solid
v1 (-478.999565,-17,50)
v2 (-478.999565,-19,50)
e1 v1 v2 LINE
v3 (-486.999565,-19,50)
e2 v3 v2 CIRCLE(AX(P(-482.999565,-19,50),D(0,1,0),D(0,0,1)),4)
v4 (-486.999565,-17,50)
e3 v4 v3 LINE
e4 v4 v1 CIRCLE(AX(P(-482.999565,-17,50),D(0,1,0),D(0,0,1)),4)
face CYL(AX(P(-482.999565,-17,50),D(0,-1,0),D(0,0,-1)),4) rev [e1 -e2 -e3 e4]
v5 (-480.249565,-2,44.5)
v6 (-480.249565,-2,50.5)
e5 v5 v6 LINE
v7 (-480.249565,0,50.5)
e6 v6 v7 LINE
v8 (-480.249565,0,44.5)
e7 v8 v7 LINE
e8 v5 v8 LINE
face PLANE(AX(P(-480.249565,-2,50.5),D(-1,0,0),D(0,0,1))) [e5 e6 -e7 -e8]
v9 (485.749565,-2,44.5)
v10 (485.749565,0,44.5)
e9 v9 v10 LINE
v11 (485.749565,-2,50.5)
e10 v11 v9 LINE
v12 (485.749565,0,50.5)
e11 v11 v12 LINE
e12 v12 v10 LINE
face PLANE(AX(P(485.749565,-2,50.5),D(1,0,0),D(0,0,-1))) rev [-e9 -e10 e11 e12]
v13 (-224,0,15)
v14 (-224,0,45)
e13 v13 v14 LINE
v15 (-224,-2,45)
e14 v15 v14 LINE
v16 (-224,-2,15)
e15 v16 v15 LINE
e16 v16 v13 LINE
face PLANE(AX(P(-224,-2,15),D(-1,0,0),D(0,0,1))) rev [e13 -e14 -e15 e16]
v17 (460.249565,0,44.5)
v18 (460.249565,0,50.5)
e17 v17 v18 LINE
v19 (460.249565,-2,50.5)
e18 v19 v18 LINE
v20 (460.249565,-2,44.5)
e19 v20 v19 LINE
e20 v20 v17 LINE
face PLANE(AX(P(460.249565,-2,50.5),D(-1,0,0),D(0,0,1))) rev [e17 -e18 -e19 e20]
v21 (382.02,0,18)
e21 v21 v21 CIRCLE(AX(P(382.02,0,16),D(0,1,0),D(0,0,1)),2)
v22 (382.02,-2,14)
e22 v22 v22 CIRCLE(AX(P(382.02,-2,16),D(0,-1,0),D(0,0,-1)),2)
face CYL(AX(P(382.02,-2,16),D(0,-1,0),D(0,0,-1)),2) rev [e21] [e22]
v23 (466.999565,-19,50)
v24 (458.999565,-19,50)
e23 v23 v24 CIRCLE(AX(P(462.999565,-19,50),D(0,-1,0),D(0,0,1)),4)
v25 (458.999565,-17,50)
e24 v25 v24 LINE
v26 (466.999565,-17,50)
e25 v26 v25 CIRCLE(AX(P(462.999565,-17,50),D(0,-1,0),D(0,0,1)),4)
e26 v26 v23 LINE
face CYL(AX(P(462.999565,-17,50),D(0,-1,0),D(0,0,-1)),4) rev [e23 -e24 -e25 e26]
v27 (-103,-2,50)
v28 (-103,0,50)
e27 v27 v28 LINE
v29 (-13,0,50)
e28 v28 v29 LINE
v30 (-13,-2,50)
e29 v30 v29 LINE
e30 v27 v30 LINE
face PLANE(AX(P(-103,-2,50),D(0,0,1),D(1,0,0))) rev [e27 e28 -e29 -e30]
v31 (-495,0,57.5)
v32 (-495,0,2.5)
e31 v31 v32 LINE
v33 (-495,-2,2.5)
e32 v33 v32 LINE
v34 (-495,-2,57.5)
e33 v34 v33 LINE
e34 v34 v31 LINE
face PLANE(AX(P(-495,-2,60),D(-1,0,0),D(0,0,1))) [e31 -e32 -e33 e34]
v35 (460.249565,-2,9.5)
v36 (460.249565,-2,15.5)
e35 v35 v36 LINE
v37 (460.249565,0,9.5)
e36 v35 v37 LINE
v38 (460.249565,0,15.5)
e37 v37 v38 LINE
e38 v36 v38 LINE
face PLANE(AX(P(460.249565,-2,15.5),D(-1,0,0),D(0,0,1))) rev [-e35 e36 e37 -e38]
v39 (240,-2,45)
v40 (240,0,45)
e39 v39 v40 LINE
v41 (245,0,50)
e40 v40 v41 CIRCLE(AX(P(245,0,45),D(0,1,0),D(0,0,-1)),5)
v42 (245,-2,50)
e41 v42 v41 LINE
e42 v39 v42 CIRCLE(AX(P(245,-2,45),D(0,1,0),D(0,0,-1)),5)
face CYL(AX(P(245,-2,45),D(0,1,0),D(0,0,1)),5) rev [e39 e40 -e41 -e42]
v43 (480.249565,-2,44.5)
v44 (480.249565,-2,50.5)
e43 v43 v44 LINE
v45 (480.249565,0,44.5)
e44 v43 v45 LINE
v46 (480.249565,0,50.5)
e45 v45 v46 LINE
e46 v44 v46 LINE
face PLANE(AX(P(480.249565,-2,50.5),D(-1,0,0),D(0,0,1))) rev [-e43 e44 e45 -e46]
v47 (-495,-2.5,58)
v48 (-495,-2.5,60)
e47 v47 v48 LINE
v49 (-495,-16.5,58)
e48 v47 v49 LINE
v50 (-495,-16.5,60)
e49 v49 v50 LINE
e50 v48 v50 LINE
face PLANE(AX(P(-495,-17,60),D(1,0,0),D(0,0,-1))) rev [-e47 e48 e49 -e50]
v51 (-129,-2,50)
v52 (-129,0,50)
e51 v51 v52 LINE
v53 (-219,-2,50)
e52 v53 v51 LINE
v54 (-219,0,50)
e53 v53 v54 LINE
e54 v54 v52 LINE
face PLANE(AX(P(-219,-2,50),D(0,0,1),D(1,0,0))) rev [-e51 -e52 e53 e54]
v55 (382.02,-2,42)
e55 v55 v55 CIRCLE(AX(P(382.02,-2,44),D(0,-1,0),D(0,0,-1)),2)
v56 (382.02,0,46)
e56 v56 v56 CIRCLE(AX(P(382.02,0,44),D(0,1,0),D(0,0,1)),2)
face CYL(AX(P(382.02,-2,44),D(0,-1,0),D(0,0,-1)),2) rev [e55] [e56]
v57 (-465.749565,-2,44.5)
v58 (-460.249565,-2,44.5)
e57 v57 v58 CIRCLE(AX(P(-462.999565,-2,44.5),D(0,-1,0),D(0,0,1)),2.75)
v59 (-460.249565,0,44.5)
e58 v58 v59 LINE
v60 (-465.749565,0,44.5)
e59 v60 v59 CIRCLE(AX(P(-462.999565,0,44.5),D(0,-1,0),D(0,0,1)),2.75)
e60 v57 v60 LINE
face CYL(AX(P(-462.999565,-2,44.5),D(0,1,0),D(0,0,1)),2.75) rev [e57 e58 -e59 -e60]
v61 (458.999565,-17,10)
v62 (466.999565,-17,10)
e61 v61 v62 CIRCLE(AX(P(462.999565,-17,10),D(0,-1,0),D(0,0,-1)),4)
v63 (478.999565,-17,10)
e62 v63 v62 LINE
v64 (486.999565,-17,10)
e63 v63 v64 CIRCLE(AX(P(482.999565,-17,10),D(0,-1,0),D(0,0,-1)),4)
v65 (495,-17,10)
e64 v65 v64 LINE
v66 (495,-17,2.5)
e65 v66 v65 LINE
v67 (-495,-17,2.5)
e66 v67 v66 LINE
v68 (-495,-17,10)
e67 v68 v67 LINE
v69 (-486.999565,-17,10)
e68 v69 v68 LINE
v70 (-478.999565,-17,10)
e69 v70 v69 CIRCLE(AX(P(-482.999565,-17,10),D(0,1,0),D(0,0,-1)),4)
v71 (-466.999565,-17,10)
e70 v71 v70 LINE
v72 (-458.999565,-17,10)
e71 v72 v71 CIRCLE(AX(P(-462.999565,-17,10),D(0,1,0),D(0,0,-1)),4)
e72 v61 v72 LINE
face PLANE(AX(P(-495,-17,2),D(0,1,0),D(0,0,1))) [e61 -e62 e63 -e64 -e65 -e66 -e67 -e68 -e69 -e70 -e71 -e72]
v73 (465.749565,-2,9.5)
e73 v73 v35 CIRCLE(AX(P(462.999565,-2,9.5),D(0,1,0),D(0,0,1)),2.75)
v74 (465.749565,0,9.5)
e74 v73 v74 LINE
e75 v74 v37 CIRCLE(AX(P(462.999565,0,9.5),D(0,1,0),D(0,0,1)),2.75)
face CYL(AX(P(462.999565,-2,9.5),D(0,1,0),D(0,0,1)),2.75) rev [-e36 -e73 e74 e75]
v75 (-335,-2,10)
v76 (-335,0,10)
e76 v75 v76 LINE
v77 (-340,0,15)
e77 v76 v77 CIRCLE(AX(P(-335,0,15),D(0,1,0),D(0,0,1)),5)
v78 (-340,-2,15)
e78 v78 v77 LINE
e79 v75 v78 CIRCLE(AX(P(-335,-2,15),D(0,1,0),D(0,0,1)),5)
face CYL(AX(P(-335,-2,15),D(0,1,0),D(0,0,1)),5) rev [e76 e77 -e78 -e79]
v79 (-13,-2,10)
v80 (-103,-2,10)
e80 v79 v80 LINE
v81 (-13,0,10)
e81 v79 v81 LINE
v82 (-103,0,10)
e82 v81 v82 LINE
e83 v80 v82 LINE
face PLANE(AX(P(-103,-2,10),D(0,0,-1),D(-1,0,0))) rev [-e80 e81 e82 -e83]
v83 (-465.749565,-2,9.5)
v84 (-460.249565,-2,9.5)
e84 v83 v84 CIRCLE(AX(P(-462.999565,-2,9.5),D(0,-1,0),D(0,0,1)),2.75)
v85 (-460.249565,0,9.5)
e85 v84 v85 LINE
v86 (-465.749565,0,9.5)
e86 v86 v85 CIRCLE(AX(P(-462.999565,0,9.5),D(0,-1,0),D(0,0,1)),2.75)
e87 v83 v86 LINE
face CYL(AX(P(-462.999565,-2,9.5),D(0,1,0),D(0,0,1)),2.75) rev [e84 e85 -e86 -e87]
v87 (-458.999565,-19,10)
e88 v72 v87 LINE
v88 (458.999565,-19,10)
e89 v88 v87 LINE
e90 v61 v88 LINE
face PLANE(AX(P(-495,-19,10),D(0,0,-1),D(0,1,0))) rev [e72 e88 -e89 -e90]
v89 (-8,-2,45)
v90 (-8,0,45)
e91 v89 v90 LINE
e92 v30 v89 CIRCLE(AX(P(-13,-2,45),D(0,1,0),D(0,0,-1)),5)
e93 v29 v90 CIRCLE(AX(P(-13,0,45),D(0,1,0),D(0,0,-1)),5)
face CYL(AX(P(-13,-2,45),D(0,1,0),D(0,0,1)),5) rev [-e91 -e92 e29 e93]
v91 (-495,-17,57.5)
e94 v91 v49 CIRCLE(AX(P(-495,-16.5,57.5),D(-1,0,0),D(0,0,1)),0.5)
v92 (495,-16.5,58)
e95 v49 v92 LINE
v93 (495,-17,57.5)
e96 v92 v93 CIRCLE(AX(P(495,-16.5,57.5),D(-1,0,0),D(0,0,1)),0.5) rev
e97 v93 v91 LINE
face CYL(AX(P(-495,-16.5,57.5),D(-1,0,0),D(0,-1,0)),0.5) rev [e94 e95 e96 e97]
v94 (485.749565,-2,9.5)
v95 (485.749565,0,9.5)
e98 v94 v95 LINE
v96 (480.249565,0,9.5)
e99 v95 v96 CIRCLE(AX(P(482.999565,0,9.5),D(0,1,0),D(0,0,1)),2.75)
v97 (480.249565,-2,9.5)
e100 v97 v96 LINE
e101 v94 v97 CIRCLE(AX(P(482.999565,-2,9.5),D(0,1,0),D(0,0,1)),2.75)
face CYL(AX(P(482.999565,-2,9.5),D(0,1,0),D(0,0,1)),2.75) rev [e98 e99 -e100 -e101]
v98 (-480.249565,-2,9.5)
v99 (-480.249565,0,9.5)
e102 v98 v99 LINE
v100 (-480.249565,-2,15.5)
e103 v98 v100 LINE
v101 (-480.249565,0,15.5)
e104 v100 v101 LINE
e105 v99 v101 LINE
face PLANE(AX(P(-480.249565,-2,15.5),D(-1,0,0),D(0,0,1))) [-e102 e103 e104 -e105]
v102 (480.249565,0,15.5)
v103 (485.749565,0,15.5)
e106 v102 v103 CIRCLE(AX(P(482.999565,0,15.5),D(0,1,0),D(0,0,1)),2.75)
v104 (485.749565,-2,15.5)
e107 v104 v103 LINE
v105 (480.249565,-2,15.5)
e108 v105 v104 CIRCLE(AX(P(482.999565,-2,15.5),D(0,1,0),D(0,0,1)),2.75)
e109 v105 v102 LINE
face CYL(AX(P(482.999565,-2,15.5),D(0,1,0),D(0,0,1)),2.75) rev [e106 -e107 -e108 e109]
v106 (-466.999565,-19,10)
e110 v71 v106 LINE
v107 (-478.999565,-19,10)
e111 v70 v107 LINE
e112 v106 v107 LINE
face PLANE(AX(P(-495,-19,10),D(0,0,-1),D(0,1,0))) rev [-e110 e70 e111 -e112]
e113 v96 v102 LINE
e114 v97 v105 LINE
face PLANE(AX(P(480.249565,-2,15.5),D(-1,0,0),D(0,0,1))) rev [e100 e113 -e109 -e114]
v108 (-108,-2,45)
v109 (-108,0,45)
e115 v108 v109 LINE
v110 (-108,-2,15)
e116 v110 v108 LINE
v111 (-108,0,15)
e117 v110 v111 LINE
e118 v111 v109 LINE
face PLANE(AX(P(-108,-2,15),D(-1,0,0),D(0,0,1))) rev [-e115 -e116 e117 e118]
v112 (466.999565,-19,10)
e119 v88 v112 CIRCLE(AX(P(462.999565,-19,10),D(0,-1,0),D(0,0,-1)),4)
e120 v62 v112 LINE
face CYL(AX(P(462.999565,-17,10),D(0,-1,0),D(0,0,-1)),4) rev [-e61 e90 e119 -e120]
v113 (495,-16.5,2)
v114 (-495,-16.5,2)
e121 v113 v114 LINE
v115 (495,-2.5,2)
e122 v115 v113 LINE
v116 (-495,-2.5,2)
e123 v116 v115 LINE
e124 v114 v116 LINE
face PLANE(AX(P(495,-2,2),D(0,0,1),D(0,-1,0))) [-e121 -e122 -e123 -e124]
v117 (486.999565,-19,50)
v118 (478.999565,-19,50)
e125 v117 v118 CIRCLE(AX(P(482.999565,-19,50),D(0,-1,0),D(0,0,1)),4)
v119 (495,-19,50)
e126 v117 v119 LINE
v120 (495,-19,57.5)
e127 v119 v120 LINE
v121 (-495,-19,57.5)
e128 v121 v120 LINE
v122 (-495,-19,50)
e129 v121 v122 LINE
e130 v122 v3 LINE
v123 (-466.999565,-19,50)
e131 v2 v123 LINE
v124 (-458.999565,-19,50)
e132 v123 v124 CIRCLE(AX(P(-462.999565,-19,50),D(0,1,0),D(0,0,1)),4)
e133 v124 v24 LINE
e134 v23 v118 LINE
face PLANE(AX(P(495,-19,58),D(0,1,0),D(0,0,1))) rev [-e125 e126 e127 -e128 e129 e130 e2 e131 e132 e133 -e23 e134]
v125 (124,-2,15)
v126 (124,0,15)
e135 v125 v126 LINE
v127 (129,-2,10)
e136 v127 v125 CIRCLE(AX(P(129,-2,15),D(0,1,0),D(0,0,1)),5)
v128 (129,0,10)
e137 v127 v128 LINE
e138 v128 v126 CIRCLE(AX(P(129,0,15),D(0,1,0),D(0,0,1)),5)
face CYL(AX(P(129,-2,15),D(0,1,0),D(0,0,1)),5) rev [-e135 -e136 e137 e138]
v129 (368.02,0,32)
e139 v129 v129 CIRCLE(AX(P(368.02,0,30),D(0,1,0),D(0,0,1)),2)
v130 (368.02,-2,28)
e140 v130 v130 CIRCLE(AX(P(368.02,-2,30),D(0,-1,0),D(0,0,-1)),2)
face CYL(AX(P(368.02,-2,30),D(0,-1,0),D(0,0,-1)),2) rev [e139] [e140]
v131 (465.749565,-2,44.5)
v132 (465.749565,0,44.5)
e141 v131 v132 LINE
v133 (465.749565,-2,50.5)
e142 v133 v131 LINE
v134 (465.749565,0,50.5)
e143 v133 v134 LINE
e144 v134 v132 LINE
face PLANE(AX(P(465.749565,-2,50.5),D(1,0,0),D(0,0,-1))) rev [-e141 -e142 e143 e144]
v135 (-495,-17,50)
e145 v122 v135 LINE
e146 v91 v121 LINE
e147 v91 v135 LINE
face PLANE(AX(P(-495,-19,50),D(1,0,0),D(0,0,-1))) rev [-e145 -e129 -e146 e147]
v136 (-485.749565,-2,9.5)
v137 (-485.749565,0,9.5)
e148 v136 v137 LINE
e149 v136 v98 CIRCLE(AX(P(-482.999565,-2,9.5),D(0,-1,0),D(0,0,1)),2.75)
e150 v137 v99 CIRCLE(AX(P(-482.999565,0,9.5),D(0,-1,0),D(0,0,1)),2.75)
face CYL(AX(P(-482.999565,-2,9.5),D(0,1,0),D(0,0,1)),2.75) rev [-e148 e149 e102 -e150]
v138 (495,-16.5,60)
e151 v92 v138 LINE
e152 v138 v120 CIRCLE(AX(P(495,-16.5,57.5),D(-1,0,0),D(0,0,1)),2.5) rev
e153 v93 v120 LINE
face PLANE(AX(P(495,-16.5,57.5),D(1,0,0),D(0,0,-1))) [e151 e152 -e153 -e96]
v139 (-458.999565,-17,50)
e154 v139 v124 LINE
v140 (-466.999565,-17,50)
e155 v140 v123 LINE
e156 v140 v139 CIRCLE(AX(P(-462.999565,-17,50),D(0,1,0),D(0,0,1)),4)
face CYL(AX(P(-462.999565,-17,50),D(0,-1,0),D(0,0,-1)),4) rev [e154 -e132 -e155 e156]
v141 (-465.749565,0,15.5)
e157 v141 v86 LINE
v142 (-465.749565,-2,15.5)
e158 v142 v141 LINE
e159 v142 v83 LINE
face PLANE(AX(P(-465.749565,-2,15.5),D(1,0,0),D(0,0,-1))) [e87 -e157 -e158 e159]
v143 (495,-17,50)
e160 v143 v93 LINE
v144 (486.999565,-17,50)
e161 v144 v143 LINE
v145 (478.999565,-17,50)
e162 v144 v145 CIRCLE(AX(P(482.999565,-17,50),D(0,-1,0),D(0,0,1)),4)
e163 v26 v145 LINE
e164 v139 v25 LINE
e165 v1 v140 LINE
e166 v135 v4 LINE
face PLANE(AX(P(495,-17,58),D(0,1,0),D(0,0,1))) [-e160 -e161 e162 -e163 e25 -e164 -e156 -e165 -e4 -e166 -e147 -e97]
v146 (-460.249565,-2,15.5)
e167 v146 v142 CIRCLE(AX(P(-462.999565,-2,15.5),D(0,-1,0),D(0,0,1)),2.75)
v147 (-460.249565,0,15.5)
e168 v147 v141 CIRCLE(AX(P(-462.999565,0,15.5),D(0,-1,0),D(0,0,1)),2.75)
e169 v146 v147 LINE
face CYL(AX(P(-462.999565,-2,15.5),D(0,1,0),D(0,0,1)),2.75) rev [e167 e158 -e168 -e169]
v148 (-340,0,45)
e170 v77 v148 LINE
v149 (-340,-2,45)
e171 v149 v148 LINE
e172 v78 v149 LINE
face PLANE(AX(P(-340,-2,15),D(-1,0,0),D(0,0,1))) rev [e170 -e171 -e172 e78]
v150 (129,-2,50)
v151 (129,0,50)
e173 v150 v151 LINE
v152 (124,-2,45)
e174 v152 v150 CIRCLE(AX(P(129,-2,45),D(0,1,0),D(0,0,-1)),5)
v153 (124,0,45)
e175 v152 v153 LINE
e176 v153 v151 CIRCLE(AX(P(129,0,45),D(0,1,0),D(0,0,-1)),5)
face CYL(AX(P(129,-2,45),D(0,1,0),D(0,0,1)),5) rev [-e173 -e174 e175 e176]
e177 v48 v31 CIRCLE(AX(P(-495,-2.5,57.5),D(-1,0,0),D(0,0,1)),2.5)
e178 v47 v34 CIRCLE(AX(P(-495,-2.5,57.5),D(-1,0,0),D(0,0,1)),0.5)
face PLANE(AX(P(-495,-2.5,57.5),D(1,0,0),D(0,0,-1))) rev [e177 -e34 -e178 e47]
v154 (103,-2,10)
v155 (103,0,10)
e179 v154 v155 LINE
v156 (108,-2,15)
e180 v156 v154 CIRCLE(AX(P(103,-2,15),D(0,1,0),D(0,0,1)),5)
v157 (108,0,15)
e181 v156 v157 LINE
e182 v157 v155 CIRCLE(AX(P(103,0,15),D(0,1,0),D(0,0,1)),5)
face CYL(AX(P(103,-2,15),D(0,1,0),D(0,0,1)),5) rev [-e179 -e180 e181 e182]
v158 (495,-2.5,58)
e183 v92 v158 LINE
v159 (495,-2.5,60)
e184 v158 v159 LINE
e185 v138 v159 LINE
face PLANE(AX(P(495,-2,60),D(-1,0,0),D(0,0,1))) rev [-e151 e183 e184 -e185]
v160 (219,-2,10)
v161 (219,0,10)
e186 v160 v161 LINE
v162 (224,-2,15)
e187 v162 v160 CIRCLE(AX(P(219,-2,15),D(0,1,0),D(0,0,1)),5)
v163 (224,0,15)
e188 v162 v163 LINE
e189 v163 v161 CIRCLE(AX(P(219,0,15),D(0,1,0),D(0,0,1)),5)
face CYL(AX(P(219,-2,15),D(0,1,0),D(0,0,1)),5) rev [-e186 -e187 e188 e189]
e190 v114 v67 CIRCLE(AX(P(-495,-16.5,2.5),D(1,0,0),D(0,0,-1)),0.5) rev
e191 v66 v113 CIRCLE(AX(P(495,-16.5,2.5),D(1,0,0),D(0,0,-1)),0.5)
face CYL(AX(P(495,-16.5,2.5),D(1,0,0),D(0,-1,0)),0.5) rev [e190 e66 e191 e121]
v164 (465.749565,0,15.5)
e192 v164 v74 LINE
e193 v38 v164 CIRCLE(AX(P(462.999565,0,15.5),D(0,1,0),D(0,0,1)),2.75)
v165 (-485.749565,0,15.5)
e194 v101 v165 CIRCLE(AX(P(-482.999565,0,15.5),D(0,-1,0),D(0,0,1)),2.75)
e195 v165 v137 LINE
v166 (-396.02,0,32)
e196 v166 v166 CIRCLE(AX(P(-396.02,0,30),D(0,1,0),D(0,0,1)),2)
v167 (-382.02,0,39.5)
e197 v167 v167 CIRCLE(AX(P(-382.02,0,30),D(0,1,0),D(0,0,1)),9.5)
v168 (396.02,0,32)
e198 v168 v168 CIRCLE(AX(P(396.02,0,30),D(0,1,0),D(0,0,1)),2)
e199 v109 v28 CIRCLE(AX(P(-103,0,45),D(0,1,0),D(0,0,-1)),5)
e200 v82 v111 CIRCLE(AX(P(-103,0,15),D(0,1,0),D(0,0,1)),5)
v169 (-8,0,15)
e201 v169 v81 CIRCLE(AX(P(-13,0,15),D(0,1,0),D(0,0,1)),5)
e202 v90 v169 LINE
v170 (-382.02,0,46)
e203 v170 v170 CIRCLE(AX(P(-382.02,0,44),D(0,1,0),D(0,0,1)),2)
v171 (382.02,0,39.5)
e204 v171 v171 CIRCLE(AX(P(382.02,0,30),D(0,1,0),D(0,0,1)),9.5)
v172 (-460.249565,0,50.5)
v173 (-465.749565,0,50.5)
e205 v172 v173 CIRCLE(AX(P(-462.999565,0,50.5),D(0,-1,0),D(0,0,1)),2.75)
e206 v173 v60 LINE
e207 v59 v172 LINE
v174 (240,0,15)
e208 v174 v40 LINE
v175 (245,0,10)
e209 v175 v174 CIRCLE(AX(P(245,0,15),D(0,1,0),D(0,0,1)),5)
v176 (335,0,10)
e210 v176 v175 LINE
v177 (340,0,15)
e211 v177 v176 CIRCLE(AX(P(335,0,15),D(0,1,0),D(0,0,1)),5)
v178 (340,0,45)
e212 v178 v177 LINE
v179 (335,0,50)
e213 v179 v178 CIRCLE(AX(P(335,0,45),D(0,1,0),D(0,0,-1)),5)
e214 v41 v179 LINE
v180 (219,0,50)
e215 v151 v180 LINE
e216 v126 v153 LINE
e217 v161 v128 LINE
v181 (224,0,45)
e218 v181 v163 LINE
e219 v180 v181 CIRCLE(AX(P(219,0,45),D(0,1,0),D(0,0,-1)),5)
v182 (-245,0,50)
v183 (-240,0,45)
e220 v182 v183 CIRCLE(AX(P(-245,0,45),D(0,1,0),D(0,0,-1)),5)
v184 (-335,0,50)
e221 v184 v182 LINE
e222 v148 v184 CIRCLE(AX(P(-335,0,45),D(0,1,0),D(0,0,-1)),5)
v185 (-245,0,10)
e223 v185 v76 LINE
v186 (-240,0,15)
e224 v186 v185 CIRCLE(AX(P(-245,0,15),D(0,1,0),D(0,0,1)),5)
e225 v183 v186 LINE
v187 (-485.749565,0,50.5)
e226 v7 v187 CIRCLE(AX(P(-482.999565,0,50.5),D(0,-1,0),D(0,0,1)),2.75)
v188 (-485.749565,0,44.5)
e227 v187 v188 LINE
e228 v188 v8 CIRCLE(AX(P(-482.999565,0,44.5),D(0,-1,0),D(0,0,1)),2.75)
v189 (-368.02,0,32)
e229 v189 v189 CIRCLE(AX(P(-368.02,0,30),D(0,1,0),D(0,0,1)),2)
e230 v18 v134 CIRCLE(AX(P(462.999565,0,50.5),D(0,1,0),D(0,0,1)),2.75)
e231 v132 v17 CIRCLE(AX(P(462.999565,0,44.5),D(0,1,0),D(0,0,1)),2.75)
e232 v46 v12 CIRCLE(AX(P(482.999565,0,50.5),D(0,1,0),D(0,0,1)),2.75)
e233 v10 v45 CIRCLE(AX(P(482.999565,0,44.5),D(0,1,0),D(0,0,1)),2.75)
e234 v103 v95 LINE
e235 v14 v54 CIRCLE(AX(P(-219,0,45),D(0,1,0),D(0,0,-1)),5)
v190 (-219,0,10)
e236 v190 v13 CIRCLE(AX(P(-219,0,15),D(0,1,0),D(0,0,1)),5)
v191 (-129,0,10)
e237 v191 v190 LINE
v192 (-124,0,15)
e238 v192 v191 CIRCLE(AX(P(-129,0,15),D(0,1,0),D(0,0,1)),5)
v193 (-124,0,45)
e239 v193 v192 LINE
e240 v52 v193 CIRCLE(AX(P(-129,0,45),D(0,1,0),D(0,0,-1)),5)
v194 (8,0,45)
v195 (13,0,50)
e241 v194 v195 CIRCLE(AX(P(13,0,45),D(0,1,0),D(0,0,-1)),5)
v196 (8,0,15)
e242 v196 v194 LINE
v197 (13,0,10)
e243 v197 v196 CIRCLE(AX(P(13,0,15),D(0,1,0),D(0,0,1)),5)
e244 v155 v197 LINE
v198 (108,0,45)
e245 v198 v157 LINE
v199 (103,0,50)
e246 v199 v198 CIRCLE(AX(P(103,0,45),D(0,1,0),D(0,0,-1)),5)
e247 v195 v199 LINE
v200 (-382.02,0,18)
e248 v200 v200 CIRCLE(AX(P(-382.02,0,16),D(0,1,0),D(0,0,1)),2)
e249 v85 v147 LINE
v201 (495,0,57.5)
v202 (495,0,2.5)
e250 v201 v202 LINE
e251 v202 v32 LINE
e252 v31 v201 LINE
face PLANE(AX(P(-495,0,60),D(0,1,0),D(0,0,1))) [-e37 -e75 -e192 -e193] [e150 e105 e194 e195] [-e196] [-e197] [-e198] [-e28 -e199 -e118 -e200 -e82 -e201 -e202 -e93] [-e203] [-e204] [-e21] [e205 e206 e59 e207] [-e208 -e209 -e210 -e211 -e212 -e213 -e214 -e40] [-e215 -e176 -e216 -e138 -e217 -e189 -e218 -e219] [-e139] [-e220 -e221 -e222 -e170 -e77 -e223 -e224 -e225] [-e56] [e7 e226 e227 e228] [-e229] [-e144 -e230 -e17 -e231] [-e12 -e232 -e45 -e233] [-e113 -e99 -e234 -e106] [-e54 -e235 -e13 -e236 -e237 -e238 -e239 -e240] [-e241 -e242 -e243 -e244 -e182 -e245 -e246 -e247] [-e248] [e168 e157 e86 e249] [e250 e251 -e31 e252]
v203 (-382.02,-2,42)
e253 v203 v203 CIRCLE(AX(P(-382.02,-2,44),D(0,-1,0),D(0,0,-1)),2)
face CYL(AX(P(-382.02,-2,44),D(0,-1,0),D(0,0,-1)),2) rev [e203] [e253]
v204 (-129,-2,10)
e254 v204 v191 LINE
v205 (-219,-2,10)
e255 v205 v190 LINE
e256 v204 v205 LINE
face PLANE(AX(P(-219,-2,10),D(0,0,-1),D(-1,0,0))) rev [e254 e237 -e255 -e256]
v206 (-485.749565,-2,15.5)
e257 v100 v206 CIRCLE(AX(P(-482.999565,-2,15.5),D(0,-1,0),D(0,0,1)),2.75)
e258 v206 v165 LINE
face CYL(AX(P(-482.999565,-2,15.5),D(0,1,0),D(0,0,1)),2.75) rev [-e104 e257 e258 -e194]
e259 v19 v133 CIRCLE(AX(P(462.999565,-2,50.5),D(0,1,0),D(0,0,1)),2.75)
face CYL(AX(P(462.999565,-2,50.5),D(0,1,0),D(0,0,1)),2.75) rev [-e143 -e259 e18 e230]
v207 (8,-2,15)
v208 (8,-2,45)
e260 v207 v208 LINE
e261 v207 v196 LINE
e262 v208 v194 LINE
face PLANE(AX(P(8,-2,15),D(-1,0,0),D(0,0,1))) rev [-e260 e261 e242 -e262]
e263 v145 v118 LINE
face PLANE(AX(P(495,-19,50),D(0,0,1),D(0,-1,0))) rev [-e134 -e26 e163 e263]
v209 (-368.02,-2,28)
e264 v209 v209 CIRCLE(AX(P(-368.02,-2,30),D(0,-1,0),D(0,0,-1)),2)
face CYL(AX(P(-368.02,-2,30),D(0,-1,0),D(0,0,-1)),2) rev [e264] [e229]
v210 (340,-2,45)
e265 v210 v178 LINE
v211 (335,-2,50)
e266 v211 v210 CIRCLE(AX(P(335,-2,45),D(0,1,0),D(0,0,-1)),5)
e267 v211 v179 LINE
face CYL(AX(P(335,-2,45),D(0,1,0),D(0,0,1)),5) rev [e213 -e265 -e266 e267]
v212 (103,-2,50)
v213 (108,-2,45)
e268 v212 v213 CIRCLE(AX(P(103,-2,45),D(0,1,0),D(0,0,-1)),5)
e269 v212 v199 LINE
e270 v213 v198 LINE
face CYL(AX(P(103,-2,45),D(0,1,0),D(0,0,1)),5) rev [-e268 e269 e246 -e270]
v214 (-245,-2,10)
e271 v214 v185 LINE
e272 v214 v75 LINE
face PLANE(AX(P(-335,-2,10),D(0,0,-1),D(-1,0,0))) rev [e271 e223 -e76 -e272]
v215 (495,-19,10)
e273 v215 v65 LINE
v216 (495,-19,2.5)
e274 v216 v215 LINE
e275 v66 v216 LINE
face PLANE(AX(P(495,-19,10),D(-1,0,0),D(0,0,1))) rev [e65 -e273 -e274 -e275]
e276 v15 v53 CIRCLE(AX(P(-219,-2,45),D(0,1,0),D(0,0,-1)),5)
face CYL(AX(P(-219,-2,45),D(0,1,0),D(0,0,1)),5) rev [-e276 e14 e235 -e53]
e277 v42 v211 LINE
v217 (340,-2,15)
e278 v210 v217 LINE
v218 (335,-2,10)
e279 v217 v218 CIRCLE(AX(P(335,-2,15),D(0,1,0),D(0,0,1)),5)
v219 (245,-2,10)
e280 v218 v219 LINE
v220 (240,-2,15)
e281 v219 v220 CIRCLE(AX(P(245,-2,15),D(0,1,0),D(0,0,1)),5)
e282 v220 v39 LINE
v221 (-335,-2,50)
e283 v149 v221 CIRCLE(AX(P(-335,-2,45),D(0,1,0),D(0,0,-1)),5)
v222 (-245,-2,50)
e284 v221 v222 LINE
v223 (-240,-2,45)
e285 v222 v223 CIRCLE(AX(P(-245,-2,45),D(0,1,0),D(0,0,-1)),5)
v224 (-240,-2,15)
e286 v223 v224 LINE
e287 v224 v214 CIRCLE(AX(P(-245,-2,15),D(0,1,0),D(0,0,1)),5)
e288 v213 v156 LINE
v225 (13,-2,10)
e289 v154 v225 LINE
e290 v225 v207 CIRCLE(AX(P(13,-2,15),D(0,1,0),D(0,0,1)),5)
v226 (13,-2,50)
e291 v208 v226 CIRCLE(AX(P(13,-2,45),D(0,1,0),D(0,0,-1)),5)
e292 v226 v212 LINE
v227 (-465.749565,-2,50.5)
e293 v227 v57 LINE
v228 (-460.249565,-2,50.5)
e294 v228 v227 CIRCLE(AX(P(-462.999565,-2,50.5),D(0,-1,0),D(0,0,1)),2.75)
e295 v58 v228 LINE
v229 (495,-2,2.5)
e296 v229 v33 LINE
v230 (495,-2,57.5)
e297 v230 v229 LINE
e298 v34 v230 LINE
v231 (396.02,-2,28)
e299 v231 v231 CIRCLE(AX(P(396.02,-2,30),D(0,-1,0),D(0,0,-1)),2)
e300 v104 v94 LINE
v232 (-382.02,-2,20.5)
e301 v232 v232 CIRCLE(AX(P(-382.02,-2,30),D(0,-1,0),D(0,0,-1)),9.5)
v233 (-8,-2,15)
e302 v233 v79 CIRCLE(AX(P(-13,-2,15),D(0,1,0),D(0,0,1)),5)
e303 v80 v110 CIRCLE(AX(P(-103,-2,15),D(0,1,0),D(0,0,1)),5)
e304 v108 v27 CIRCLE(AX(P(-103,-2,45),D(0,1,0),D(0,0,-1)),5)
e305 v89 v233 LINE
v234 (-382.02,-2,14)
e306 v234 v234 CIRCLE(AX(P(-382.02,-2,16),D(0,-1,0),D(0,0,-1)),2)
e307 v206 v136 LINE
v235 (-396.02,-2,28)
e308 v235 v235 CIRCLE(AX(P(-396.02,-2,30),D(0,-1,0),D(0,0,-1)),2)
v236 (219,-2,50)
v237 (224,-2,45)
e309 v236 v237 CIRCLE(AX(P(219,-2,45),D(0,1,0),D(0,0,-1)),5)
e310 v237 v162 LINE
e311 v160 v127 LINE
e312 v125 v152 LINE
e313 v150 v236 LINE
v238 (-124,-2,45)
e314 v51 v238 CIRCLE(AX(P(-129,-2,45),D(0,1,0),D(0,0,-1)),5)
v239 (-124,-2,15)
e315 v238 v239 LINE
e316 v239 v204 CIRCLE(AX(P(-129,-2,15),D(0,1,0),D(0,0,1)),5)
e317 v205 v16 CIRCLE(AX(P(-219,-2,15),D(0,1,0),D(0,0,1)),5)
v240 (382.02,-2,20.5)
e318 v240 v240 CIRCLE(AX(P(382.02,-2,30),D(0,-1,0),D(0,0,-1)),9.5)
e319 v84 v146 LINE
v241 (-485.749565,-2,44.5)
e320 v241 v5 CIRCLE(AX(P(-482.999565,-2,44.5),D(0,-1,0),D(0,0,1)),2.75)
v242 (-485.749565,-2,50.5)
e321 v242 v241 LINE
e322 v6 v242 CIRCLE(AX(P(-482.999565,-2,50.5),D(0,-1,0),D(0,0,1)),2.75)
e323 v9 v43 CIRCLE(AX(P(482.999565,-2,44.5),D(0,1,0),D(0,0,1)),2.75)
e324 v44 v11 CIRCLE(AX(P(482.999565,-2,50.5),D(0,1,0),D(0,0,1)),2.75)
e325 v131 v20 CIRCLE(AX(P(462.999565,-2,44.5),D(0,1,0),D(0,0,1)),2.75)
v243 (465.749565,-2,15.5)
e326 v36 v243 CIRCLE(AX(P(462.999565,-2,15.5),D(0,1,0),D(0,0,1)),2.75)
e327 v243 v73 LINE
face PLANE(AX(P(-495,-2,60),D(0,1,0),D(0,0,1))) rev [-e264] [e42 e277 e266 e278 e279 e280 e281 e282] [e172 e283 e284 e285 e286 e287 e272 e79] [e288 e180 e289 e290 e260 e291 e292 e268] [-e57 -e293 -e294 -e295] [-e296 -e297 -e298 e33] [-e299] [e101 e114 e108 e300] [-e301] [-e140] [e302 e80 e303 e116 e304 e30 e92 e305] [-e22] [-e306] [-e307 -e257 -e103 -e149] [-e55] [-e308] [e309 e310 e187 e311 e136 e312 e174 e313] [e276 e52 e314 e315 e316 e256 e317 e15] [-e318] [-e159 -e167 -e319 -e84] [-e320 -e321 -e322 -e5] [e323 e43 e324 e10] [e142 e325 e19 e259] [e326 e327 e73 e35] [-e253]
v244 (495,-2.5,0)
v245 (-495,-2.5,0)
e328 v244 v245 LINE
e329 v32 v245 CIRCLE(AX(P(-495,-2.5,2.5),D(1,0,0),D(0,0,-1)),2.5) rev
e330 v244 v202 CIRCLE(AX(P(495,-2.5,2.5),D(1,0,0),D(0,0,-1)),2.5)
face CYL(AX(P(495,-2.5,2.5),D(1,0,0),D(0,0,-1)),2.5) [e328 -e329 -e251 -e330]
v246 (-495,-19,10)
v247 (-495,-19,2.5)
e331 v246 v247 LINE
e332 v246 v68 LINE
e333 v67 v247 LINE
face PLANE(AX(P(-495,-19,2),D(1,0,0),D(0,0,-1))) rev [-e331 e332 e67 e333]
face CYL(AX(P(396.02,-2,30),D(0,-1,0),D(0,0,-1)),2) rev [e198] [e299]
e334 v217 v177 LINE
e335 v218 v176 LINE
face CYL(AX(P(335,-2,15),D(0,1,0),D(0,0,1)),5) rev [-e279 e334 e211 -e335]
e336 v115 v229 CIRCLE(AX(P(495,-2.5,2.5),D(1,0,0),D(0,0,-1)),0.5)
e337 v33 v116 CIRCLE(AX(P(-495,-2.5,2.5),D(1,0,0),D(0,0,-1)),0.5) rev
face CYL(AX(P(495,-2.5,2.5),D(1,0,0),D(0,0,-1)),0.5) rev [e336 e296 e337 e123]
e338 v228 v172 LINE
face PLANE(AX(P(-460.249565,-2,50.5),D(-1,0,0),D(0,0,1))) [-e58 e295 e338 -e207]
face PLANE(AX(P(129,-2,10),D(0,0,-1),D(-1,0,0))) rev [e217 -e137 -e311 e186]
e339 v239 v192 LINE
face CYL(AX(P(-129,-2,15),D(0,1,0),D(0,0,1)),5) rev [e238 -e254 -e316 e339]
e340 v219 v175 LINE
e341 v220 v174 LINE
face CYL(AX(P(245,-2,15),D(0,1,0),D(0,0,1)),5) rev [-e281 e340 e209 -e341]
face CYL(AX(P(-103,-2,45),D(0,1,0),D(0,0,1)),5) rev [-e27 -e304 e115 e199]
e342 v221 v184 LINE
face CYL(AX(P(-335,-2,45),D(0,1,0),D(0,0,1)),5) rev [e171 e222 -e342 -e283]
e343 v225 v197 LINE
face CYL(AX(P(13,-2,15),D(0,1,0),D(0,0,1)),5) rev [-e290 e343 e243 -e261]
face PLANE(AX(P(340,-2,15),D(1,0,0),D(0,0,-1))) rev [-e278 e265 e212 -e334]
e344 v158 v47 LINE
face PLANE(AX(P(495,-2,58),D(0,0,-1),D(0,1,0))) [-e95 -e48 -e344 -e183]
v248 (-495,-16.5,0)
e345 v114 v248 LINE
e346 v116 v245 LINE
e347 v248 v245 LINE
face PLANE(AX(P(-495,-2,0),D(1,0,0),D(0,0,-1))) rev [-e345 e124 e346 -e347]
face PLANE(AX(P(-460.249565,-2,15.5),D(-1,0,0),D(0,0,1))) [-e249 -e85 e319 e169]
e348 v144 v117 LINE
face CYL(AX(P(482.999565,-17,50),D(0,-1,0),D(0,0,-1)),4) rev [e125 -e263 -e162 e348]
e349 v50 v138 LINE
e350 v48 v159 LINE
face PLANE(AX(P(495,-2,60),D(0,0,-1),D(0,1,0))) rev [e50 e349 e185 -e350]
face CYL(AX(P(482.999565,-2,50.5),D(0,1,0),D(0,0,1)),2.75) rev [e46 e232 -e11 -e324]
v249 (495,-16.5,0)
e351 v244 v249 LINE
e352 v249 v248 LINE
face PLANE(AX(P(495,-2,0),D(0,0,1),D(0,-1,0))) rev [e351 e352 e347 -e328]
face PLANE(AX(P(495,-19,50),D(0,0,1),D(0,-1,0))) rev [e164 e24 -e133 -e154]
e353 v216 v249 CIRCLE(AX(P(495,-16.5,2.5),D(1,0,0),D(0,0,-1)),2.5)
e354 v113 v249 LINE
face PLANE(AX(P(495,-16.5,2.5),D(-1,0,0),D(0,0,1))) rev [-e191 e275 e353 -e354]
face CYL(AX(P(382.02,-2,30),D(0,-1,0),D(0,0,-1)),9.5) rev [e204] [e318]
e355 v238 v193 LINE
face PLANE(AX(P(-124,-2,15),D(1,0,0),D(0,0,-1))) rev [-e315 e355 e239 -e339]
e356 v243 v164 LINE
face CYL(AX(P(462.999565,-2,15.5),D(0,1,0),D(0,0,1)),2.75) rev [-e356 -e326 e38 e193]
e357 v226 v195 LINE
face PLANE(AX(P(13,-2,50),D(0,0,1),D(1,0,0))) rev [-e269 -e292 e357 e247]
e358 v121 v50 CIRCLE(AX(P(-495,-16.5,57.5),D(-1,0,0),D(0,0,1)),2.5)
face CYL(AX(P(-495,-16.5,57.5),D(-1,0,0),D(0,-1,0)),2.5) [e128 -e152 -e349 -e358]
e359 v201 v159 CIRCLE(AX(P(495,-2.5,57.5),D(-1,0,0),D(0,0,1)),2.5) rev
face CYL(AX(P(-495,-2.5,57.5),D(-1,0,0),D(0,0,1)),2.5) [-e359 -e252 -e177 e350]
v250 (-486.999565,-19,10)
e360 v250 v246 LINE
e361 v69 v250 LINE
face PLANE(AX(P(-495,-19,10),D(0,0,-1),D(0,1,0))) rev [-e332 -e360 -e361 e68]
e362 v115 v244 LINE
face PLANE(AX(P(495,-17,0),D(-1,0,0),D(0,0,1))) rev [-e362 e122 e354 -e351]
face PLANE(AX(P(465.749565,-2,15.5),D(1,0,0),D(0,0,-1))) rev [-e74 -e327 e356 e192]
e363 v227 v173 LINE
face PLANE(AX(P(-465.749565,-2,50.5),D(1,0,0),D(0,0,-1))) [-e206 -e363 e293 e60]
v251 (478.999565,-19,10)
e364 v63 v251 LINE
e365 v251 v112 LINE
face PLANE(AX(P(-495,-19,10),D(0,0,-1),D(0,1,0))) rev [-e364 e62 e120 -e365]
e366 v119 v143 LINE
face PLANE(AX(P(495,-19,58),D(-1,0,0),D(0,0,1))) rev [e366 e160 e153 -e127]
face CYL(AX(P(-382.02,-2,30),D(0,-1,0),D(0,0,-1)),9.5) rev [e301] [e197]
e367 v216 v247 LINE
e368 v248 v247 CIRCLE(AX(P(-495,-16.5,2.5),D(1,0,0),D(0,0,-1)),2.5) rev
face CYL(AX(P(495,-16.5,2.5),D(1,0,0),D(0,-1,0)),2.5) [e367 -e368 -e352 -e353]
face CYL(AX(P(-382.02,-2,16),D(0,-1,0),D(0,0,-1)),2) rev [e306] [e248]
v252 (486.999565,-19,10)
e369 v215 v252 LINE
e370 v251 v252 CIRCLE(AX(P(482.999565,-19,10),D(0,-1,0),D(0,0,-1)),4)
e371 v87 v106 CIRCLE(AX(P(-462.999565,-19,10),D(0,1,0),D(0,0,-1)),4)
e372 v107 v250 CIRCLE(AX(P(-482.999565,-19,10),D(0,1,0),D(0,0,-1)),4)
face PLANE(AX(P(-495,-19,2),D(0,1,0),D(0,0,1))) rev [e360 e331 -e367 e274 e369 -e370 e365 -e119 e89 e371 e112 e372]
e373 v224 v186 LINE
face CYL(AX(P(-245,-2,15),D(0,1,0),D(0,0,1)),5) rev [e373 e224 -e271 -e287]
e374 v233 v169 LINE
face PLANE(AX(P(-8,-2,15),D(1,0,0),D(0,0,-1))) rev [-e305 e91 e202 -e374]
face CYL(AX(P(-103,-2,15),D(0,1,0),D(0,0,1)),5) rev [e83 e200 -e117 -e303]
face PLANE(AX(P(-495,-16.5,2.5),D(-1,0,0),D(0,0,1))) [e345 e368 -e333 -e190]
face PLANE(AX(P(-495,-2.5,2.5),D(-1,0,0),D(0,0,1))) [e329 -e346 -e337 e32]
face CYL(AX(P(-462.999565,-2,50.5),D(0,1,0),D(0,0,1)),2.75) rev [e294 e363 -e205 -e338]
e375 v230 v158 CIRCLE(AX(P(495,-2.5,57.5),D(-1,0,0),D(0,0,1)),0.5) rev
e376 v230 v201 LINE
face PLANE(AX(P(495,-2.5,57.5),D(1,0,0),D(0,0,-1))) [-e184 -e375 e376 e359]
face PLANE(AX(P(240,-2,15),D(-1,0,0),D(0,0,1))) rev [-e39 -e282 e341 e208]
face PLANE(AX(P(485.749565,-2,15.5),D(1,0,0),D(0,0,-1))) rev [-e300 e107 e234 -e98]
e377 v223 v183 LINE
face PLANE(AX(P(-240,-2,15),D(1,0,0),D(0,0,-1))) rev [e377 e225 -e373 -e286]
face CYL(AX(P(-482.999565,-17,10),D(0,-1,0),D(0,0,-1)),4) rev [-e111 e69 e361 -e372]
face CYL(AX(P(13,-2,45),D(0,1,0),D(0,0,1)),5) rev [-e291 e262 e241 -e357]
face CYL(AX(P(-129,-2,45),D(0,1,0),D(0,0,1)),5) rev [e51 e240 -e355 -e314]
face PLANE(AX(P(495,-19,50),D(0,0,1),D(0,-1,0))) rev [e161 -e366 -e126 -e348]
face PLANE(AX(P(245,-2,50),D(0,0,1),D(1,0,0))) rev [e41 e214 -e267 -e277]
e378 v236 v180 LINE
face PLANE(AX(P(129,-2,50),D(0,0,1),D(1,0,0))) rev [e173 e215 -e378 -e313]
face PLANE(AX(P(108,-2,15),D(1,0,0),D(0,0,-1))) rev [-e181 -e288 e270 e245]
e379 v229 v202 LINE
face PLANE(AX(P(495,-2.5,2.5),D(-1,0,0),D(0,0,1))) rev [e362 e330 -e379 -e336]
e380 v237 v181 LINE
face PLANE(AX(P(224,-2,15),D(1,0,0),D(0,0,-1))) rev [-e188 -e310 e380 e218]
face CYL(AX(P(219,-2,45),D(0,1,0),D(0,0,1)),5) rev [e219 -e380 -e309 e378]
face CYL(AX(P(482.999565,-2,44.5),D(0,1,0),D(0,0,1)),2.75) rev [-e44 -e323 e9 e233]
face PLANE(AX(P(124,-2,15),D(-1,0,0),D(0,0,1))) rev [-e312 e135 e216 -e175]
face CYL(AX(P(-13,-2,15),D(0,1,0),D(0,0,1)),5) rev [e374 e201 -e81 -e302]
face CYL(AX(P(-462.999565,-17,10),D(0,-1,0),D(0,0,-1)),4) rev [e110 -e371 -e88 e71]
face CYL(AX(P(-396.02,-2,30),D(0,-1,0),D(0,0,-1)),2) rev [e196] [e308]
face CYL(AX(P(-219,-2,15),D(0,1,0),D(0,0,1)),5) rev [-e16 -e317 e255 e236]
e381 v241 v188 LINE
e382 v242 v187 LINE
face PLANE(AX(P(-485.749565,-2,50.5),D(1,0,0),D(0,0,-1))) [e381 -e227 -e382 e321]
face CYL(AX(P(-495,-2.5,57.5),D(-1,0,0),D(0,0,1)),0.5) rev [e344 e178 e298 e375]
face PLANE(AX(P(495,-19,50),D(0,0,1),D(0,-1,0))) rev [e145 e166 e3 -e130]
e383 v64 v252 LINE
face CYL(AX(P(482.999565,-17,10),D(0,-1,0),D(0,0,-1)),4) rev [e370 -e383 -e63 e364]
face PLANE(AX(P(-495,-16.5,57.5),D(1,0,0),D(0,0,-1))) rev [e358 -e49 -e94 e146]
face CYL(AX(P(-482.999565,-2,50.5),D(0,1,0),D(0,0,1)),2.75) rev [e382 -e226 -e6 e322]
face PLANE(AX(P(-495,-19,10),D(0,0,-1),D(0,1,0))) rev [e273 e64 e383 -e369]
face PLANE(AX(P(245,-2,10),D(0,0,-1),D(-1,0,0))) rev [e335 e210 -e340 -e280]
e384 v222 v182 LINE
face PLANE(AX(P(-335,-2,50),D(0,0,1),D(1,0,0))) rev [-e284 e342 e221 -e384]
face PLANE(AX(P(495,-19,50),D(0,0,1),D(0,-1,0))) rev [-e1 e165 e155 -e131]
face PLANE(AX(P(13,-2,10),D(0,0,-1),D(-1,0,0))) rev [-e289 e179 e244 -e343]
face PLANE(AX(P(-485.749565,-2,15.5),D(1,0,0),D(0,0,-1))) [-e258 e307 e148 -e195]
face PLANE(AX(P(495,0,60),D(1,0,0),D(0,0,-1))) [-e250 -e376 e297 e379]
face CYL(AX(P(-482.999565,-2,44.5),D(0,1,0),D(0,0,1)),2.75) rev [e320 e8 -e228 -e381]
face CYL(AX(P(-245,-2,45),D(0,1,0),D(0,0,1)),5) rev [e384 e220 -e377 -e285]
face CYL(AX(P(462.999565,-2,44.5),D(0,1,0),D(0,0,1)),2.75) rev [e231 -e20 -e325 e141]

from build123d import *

# Parameters (mm, degrees)
SKETCH_1_W                       = 990
SKETCH_1_H                       = 2
SM_BASE_FLANGE_1_DEPTH           = 60
SM_EDGE_FLANGE_1_STRIP_W         = 9
SM_EDGE_FLANGE_1_STRIP_H         = 2
SM_EDGE_FLANGE_1_STRIP_CUT_DEPTH = 990
SM_EDGE_FLANGE_1_DEPTH           = 990
SM_EDGE_FLANGE_2_STRIP_W         = 9
SM_EDGE_FLANGE_2_STRIP_H         = 2
SM_EDGE_FLANGE_2_STRIP_CUT_DEPTH = 990
SM_EDGE_FLANGE_2_DEPTH           = 990
SM_EDGE_FLANGE_3_STRIP_W         = 9
SM_EDGE_FLANGE_3_STRIP_H         = 2
SM_EDGE_FLANGE_3_STRIP_CUT_DEPTH = 990
SM_EDGE_FLANGE_3_DEPTH           = 990
SM_EDGE_FLANGE_4_STRIP_W         = 9
SM_EDGE_FLANGE_4_STRIP_H         = 2
SM_EDGE_FLANGE_4_STRIP_CUT_DEPTH = 990
SM_EDGE_FLANGE_4_DEPTH           = 990
HOLE_WIZARD_19_0_19_1_D          = 19
HOLE_WIZARD_M4_1_D               = 4
PATTERN_LINEAR_1_COUNT           = 2
PATTERN_LINEAR_1_PITCH           = 764.04
CUT_EXTRUDE_1_DEPTH              = 2
PATTERN_LINEAR_2_COUNT           = 2
PATTERN_LINEAR_2_PITCH           = 20
PATTERN_LINEAR_2_COUNT_DIR2      = 2
PATTERN_LINEAR_2_PITCH_DIR2      = 35
CUT_EXTRUDE_4_DEPTH              = 2
MIRROR_1_COPY_1_DEPTH            = 2
MIRROR_1_COPY_2_DEPTH            = 2
MIRROR_1_COPY_3_DEPTH            = 2
CUT_EXTRUDE_2_DEPTH              = 2
PATTERN_LINEAR_3_COUNT           = 6
PATTERN_LINEAR_3_PITCH           = 116


# Sheet-metal steps are written as plain solids
with BuildPart() as part:
    # Sketch 1 → 基体-法兰1 (new body)
    with BuildSketch(Plane.XY):
        with Locations((0, -1)):
            Rectangle(SKETCH_1_W, SKETCH_1_H)
    extrude(amount=SM_BASE_FLANGE_1_DEPTH)

    # 边线-法兰1 strip (across the edge) → 边线-法兰1 strip cut (cut)
    with BuildSketch(Plane(origin=(-495, -2, 0), x_dir=(0, 0, 1), z_dir=(1, 0, 0))):
        with Locations((-2, -1)):
            Rectangle(SM_EDGE_FLANGE_1_STRIP_W, SM_EDGE_FLANGE_1_STRIP_H)
    extrude(amount=SM_EDGE_FLANGE_1_STRIP_CUT_DEPTH, mode=Mode.SUBTRACT)

    # 边线-法兰1 section (across the edge) → 边线-法兰1 (add)
    with BuildSketch(Plane(origin=(-495, -2, 0), x_dir=(0, 0, 1), z_dir=(1, 0, 0))):
        with BuildLine():
            Line((0, 0.5), (0, 15))
            Line((0, 15), (2, 15))
            Line((2, 15), (2, 0.5))
            ThreePointArc((2, 0.5), (2.146446609, 0.146446609), (2.5, 0))
            Line((2.5, 0), (2.5, -2))
            ThreePointArc((2.5, -2), (0.732233047, -1.267766953), (0, 0.5))
        make_face()
    extrude(amount=SM_EDGE_FLANGE_1_DEPTH)

    # 边线-法兰2 strip (across the edge) → 边线-法兰2 strip cut (cut)
    with BuildSketch(Plane(origin=(495, -2, 60), x_dir=(0, 0, -1), z_dir=(-1, 0, 0))):
        with Locations((-2, -1)):
            Rectangle(SM_EDGE_FLANGE_2_STRIP_W, SM_EDGE_FLANGE_2_STRIP_H)
    extrude(amount=SM_EDGE_FLANGE_2_STRIP_CUT_DEPTH, mode=Mode.SUBTRACT)

    # 边线-法兰2 section (across the edge) → 边线-法兰2 (add)
    with BuildSketch(Plane(origin=(495, -2, 60), x_dir=(0, 0, -1), z_dir=(-1, 0, 0))):
        with BuildLine():
            Line((0, 0.5), (0, 15))
            Line((0, 15), (2, 15))
            Line((2, 15), (2, 0.5))
            ThreePointArc((2, 0.5), (2.146446609, 0.146446609), (2.5, 0))
            Line((2.5, 0), (2.5, -2))
            ThreePointArc((2.5, -2), (0.732233047, -1.267766953), (0, 0.5))
        make_face()
    extrude(amount=SM_EDGE_FLANGE_2_DEPTH)

    # 边线-法兰3 strip (across the edge) → 边线-法兰3 strip cut (cut)
    with BuildSketch(Plane(origin=(495, -17, 58), x_dir=(0, 1, 0), z_dir=(-1, 0, 0))):
        with Locations((-4, -1)):
            Rectangle(SM_EDGE_FLANGE_3_STRIP_W, SM_EDGE_FLANGE_3_STRIP_H)
    extrude(amount=SM_EDGE_FLANGE_3_STRIP_CUT_DEPTH, mode=Mode.SUBTRACT)

    # 边线-法兰3 section (across the edge) → 边线-法兰3 (add)
    with BuildSketch(Plane(origin=(495, -17, 58), x_dir=(0, 1, 0), z_dir=(-1, 0, 0))):
        with BuildLine():
            Line((-2, 0.5), (-2, 8))
            Line((-2, 8), (0, 8))
            Line((0, 8), (0, 0.5))
            ThreePointArc((0, 0.5), (0.146446609, 0.146446609), (0.5, 0))
            Line((0.5, 0), (0.5, -2))
            ThreePointArc((0.5, -2), (-1.267766953, -1.267766953), (-2, 0.5))
        make_face()
    extrude(amount=SM_EDGE_FLANGE_3_DEPTH)

    # 边线-法兰4 strip (across the edge) → 边线-法兰4 strip cut (cut)
    with BuildSketch(Plane(origin=(-495, -17, 2), x_dir=(0, 1, 0), z_dir=(1, 0, 0))):
        with Locations((-4, -1)):
            Rectangle(SM_EDGE_FLANGE_4_STRIP_W, SM_EDGE_FLANGE_4_STRIP_H)
    extrude(amount=SM_EDGE_FLANGE_4_STRIP_CUT_DEPTH, mode=Mode.SUBTRACT)

    # 边线-法兰4 section (across the edge) → 边线-法兰4 (add)
    with BuildSketch(Plane(origin=(-495, -17, 2), x_dir=(0, 1, 0), z_dir=(1, 0, 0))):
        with BuildLine():
            Line((-2, 0.5), (-2, 8))
            Line((-2, 8), (0, 8))
            Line((0, 8), (0, 0.5))
            ThreePointArc((0, 0.5), (0.146446609, 0.146446609), (0.5, 0))
            Line((0.5, 0), (0.5, -2))
            ThreePointArc((0.5, -2), (-1.267766953, -1.267766953), (-2, 0.5))
        make_face()
    extrude(amount=SM_EDGE_FLANGE_4_DEPTH)

    # Ø19.0 (19) 直径孔1 (through all)
    with Locations(Plane.XZ.offset(2)):
        with Locations((-382.02, 30), (382.02, 30)):
            Hole(HOLE_WIZARD_19_0_19_1_D / 2)

    # M4 螺纹孔1 (through all)
    with Locations(Plane.XZ.offset(2)):
        with Locations((-396.02, 30), (-368.02, 30), (-382.02, 44), (-382.02, 16)):
            hole_wizard_m4_1 = Hole(HOLE_WIZARD_M4_1_D / 2)

    # 阵列(线性)1: M4 螺纹孔1 ×2
    with Locations(*[(i * PATTERN_LINEAR_1_PITCH, 0, 0) for i in range(1, PATTERN_LINEAR_1_COUNT)]):
        add(hole_wizard_m4_1, mode=Mode.SUBTRACT)

    # 草图19 → 切除-拉伸1 (cut)
    with BuildSketch(Plane(origin=(0, 0, 0), x_dir=(1, 0, 0), z_dir=(0, 1, 0))):
        with BuildLine():
            Line((460.249565443, -15.5), (460.249565443, -9.5))
            ThreePointArc((460.249565443, -9.5), (462.999565443, -6.75), (465.749565443, -9.5))
            Line((465.749565443, -9.5), (465.749565443, -15.5))
            ThreePointArc((465.749565443, -15.5), (462.999565443, -18.25), (460.249565443, -15.5))
        make_face()
    cut_extrude_1 = extrude(amount=-CUT_EXTRUDE_1_DEPTH, mode=Mode.SUBTRACT)

    # 阵列(线性)2: Cut-Extrude 1 2 × 2
    with Locations(*[(i * PATTERN_LINEAR_2_PITCH, 0, j * PATTERN_LINEAR_2_PITCH_DIR2) for i in range(PATTERN_LINEAR_2_COUNT) for j in range(PATTERN_LINEAR_2_COUNT_DIR2) if (i, j) != (0, 0)]):
        add(cut_extrude_1, mode=Mode.SUBTRACT)

    # 草图23 → 切除-拉伸4 (cut)
    with BuildSketch(Plane.XZ.offset(19)):
        with BuildLine():
            Line((466.999565443, 10), (458.999565443, 10))
            ThreePointArc((458.999565443, 10), (462.999565443, 6), (466.999565443, 10))
        make_face()
        with BuildLine():
            Line((486.999565443, 10), (478.999565443, 10))
            ThreePointArc((478.999565443, 10), (482.999565443, 6), (486.999565443, 10))
        make_face()
        with BuildLine():
            Line((486.999565443, 50), (478.999565443, 50))
            ThreePointArc((478.999565443, 50), (482.999565443, 54), (486.999565443, 50))
        make_face()
        with BuildLine():
            Line((466.999565443, 50), (458.999565443, 50))
            ThreePointArc((458.999565443, 50), (462.999565443, 54), (466.999565443, 50))
        make_face()
    cut_extrude_4 = extrude(amount=-CUT_EXTRUDE_4_DEPTH, mode=Mode.SUBTRACT)

    # 镜向1: 切除-拉伸1, 切除-拉伸4 across plane
    add(cut_extrude_1.mirror(Plane(origin=(0, 0, 0), x_dir=(0, 0, 1), z_dir=(1, 0, 0))), mode=Mode.SUBTRACT)
    add(cut_extrude_4.mirror(Plane(origin=(0, 0, 0), x_dir=(0, 0, 1), z_dir=(1, 0, 0))), mode=Mode.SUBTRACT)

    # 镜向1 copy 1 sketch → 镜向1 copy 1 (cut)
    with BuildSketch(Plane(origin=(0, 0, 35), x_dir=(-1, 0, 0), z_dir=(0, 1, 0))):
        with BuildLine():
            Line((460.249565443, 15.5), (460.249565443, 9.5))
            ThreePointArc((460.249565443, 9.5), (462.999565443, 6.75), (465.749565443, 9.5))
            Line((465.749565443, 9.5), (465.749565443, 15.5))
            ThreePointArc((465.749565443, 15.5), (462.999565443, 18.25), (460.249565443, 15.5))
        make_face()
    extrude(amount=-MIRROR_1_COPY_1_DEPTH, mode=Mode.SUBTRACT)

    # 镜向1 copy 2 sketch → 镜向1 copy 2 (cut)
    with BuildSketch(Plane(origin=(-20, 0, 0), x_dir=(-1, 0, 0), z_dir=(0, 1, 0))):
        with BuildLine():
            Line((460.249565443, 15.5), (460.249565443, 9.5))
            ThreePointArc((460.249565443, 9.5), (462.999565443, 6.75), (465.749565443, 9.5))
            Line((465.749565443, 9.5), (465.749565443, 15.5))
            ThreePointArc((465.749565443, 15.5), (462.999565443, 18.25), (460.249565443, 15.5))
        make_face()
    extrude(amount=-MIRROR_1_COPY_2_DEPTH, mode=Mode.SUBTRACT)

    # 镜向1 copy 3 sketch → 镜向1 copy 3 (cut)
    with BuildSketch(Plane(origin=(-20, 0, 35), x_dir=(-1, 0, 0), z_dir=(0, 1, 0))):
        with BuildLine():
            Line((460.249565443, 15.5), (460.249565443, 9.5))
            ThreePointArc((460.249565443, 9.5), (462.999565443, 6.75), (465.749565443, 9.5))
            Line((465.749565443, 9.5), (465.749565443, 15.5))
            ThreePointArc((465.749565443, 15.5), (462.999565443, 18.25), (460.249565443, 15.5))
        make_face()
    extrude(amount=-MIRROR_1_COPY_3_DEPTH, mode=Mode.SUBTRACT)

    # 草图20 → 切除-拉伸2 (cut)
    with BuildSketch(Plane(origin=(0, 0, 0), x_dir=(1, 0, 0), z_dir=(0, 1, 0))):
        with BuildLine():
            Line((-335, -10), (-245, -10))
            ThreePointArc((-245, -10), (-241.464466094, -11.464466094), (-240, -15))
            Line((-240, -15), (-240, -45))
            ThreePointArc((-240, -45), (-241.464466094, -48.535533906), (-245, -50))
            Line((-245, -50), (-335, -50))
            ThreePointArc((-335, -50), (-338.535533906, -48.535533906), (-340, -45))
            Line((-340, -45), (-340, -15))
            ThreePointArc((-340, -15), (-338.535533906, -11.464466094), (-335, -10))
        make_face()
    cut_extrude_2 = extrude(amount=-CUT_EXTRUDE_2_DEPTH, mode=Mode.SUBTRACT)

    # 阵列(线性)3: 切除-拉伸2 ×6
    with Locations(*[(i * PATTERN_LINEAR_3_PITCH, 0, 0) for i in range(1, PATTERN_LINEAR_3_COUNT)]):
        add(cut_extrude_2, mode=Mode.SUBTRACT)


solid = part.part
